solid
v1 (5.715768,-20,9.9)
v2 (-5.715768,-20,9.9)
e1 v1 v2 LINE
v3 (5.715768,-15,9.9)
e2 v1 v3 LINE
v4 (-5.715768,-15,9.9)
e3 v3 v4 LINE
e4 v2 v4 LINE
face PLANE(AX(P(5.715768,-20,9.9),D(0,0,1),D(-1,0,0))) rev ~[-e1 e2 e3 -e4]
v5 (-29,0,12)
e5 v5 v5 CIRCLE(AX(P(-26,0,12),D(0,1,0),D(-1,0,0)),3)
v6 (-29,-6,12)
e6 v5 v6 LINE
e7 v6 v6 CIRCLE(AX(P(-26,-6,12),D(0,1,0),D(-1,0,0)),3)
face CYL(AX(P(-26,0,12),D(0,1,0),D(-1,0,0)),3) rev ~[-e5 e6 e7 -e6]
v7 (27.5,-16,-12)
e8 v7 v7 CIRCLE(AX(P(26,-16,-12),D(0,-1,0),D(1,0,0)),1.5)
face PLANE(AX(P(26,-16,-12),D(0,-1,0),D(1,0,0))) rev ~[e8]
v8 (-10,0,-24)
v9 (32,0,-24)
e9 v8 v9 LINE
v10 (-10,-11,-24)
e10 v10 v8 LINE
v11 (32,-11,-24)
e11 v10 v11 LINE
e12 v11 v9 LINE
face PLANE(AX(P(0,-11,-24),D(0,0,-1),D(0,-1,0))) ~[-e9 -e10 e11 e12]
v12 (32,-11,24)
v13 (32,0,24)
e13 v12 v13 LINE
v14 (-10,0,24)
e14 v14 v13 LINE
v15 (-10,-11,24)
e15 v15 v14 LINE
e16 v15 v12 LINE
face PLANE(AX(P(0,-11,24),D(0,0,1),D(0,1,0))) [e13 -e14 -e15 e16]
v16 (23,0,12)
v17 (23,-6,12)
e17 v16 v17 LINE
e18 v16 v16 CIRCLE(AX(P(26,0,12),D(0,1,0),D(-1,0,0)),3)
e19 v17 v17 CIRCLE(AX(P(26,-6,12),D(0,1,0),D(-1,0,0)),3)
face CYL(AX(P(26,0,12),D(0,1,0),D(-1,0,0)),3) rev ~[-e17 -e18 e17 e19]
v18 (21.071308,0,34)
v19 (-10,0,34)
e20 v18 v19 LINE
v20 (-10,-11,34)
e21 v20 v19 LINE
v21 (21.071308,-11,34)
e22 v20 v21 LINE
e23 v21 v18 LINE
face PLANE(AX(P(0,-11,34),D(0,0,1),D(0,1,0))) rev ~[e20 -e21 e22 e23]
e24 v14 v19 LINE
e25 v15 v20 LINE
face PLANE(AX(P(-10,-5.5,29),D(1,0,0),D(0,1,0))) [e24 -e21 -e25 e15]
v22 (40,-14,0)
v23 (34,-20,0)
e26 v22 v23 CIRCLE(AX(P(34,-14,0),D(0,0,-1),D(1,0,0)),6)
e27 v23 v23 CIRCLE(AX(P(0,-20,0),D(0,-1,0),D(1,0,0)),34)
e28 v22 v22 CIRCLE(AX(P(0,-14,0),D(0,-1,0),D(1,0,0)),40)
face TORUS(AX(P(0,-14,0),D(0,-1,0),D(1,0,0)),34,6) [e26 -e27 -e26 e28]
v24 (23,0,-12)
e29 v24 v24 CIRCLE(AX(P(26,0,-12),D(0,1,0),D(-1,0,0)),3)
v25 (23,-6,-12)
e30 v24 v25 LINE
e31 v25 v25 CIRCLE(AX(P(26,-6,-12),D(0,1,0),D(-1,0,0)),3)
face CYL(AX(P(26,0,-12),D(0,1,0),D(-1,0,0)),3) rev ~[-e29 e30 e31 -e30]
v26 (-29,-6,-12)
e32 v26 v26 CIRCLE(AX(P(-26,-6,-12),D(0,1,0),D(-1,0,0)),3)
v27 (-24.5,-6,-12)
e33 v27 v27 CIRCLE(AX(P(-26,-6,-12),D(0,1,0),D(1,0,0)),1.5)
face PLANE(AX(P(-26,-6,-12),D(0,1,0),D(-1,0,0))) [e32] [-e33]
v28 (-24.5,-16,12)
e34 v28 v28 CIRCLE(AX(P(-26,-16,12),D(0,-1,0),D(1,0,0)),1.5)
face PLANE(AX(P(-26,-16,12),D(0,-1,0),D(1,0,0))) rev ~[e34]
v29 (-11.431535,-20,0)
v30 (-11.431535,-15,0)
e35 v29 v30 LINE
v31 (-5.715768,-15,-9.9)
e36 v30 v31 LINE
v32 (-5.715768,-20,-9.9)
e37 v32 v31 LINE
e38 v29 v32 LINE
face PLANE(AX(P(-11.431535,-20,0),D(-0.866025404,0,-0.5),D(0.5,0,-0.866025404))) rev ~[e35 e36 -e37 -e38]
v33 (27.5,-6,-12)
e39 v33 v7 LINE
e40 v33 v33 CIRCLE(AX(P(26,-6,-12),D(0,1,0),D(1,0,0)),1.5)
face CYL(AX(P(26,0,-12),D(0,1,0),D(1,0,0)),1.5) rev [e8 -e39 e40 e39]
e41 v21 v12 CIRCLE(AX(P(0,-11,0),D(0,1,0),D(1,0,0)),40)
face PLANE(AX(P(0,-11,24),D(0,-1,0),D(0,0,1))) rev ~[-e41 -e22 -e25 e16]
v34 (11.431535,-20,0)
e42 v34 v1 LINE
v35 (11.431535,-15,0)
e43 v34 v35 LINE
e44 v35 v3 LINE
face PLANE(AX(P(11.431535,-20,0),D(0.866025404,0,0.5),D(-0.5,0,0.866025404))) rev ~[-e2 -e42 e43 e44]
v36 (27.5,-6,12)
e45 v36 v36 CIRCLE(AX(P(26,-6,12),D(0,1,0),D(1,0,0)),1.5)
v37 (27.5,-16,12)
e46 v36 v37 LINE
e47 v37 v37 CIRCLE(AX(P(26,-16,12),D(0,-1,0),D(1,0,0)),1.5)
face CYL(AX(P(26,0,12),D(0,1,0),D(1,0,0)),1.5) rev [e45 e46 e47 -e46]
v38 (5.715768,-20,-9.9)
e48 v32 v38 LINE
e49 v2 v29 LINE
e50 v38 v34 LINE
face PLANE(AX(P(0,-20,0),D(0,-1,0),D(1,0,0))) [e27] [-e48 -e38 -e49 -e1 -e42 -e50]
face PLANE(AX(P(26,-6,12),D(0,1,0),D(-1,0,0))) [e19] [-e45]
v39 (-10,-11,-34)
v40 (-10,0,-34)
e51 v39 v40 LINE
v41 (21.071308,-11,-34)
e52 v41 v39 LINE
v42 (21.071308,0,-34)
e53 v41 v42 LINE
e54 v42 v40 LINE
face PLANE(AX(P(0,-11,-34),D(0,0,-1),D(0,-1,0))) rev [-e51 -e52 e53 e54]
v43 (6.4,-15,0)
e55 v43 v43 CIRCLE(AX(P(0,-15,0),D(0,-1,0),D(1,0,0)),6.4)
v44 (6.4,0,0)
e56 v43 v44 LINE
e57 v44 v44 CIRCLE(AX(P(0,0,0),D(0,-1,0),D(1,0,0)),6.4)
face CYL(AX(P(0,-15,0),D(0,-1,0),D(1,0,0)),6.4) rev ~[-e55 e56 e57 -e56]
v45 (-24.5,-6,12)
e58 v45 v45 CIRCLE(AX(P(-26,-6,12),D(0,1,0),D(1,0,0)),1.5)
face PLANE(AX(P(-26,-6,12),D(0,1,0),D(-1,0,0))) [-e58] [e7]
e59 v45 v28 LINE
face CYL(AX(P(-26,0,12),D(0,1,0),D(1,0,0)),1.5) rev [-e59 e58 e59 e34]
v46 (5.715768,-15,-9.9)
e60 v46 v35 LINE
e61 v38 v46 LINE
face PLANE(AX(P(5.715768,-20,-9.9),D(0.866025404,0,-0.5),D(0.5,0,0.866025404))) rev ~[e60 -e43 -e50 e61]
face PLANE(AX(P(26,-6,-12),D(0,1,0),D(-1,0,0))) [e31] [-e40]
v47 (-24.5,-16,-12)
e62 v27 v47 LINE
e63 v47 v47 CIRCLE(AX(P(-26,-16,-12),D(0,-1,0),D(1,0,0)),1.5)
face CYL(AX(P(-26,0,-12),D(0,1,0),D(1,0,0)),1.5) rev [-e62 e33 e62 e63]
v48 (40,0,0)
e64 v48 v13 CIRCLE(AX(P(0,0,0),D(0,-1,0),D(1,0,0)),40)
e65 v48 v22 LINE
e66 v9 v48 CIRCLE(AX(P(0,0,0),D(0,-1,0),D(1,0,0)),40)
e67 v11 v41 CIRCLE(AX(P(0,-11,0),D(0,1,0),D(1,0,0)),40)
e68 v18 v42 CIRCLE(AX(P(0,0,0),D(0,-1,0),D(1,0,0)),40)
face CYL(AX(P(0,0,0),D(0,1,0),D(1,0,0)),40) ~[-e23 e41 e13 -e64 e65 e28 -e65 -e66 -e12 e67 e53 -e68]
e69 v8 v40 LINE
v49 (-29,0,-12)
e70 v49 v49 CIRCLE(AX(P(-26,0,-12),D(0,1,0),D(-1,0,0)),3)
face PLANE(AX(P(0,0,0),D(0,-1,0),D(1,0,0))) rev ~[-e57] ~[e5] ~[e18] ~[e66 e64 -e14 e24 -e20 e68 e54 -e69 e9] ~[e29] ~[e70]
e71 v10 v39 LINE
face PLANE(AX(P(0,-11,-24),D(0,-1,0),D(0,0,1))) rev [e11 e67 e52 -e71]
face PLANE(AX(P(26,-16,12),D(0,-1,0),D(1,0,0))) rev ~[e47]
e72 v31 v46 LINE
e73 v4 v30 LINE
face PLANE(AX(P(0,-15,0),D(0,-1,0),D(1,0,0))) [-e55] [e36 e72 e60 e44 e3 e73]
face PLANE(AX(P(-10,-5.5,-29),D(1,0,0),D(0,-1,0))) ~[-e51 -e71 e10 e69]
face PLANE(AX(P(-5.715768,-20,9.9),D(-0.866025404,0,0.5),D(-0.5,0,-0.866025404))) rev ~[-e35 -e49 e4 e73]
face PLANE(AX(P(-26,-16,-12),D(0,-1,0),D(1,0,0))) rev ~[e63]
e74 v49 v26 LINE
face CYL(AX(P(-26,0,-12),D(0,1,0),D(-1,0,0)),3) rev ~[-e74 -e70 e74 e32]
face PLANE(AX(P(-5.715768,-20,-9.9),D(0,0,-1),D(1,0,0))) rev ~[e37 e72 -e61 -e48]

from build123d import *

# Parameters (mm, degrees)
F0_R          = 40
F1_DEPTH      = 20
F2_W          = 11
F2_H          = 10
F3_DEPTH      = 50
F3_DEPTH_BACK = 10
F4_R          = 6
F6_DEPTH      = 5
F7_R          = 6.4
F8_DEPTH      = 25
F9_R          = 1.5
F10_DEPTH     = 16
F11_R         = 3
F12_DEPTH     = 6


# Not quite as in the source:
# - a pattern or mirror of a feature is missing from the dataset's text; its kind, count and spacing are read off the source's solid


with BuildPart() as f1:
    # F0 (on Front) → F1 (new body)
    with BuildSketch(Plane.XZ):
        Circle(F0_R)
    extrude(amount=F1_DEPTH)

    # F2 (on Right) → F3 (cut, two sides)
    with BuildSketch(Plane.YZ) as f3_sk:
        with Locations((-5.5, 29)):
            Rectangle(F2_W, F2_H)
    f3 = extrude(amount=F3_DEPTH, mode=Mode.SUBTRACT) + extrude(f3_sk.sketch, amount=-F3_DEPTH_BACK, mode=Mode.SUBTRACT)

    # F3_copies: F3 across plane
    add(f3.mirror(Plane(origin=(0, 0, 0), x_dir=(-1, 0, 0), z_dir=(0, 0, -1))), mode=Mode.SUBTRACT)

    # F4
    f4_edges = [f1.edges().sort_by_distance(p)[0] for p in [
        (-40, -20, 0),
    ]]
    fillet(f4_edges, radius=F4_R)

    # F5 (on face) → F6 (cut)
    with BuildSketch(Plane.XZ.offset(20)):
        Polygon((-5.715767665, -9.9), (5.715767665, -9.9), (11.43153533, 0), (5.715767665, 9.9), (-5.715767665, 9.9), (-11.43153533, 0), align=None)
    extrude(amount=-F6_DEPTH, mode=Mode.SUBTRACT)

    # F7 (on face) → F8 (cut)
    with BuildSketch(Plane.XZ.offset(15)):
        Circle(F7_R)
    extrude(amount=-F8_DEPTH, mode=Mode.SUBTRACT)

    # F9 (on Front) → F10 (cut)
    with BuildSketch(Plane.XZ):
        with Locations((26, 12)):
            Circle(F9_R)
        with Locations((-26, 12)):
            Circle(F9_R)
        with Locations((-26, -12)):
            Circle(F9_R)
        with Locations((26, -12)):
            Circle(F9_R)
    extrude(amount=F10_DEPTH, mode=Mode.SUBTRACT)

    # F11 (on face) → F12 (cut)
    with BuildSketch(Plane(origin=(0, 0, 0), x_dir=(-1, 0, 0), z_dir=(0, 1, 0))):
        with Locations((-26, 12)):
            Circle(F11_R)
        with Locations((26, 12)):
            Circle(F11_R)
        with Locations((26, -12)):
            Circle(F11_R)
        with Locations((-26, -12)):
            Circle(F11_R)
    extrude(amount=-F12_DEPTH, mode=Mode.SUBTRACT)


solid = f1.part
